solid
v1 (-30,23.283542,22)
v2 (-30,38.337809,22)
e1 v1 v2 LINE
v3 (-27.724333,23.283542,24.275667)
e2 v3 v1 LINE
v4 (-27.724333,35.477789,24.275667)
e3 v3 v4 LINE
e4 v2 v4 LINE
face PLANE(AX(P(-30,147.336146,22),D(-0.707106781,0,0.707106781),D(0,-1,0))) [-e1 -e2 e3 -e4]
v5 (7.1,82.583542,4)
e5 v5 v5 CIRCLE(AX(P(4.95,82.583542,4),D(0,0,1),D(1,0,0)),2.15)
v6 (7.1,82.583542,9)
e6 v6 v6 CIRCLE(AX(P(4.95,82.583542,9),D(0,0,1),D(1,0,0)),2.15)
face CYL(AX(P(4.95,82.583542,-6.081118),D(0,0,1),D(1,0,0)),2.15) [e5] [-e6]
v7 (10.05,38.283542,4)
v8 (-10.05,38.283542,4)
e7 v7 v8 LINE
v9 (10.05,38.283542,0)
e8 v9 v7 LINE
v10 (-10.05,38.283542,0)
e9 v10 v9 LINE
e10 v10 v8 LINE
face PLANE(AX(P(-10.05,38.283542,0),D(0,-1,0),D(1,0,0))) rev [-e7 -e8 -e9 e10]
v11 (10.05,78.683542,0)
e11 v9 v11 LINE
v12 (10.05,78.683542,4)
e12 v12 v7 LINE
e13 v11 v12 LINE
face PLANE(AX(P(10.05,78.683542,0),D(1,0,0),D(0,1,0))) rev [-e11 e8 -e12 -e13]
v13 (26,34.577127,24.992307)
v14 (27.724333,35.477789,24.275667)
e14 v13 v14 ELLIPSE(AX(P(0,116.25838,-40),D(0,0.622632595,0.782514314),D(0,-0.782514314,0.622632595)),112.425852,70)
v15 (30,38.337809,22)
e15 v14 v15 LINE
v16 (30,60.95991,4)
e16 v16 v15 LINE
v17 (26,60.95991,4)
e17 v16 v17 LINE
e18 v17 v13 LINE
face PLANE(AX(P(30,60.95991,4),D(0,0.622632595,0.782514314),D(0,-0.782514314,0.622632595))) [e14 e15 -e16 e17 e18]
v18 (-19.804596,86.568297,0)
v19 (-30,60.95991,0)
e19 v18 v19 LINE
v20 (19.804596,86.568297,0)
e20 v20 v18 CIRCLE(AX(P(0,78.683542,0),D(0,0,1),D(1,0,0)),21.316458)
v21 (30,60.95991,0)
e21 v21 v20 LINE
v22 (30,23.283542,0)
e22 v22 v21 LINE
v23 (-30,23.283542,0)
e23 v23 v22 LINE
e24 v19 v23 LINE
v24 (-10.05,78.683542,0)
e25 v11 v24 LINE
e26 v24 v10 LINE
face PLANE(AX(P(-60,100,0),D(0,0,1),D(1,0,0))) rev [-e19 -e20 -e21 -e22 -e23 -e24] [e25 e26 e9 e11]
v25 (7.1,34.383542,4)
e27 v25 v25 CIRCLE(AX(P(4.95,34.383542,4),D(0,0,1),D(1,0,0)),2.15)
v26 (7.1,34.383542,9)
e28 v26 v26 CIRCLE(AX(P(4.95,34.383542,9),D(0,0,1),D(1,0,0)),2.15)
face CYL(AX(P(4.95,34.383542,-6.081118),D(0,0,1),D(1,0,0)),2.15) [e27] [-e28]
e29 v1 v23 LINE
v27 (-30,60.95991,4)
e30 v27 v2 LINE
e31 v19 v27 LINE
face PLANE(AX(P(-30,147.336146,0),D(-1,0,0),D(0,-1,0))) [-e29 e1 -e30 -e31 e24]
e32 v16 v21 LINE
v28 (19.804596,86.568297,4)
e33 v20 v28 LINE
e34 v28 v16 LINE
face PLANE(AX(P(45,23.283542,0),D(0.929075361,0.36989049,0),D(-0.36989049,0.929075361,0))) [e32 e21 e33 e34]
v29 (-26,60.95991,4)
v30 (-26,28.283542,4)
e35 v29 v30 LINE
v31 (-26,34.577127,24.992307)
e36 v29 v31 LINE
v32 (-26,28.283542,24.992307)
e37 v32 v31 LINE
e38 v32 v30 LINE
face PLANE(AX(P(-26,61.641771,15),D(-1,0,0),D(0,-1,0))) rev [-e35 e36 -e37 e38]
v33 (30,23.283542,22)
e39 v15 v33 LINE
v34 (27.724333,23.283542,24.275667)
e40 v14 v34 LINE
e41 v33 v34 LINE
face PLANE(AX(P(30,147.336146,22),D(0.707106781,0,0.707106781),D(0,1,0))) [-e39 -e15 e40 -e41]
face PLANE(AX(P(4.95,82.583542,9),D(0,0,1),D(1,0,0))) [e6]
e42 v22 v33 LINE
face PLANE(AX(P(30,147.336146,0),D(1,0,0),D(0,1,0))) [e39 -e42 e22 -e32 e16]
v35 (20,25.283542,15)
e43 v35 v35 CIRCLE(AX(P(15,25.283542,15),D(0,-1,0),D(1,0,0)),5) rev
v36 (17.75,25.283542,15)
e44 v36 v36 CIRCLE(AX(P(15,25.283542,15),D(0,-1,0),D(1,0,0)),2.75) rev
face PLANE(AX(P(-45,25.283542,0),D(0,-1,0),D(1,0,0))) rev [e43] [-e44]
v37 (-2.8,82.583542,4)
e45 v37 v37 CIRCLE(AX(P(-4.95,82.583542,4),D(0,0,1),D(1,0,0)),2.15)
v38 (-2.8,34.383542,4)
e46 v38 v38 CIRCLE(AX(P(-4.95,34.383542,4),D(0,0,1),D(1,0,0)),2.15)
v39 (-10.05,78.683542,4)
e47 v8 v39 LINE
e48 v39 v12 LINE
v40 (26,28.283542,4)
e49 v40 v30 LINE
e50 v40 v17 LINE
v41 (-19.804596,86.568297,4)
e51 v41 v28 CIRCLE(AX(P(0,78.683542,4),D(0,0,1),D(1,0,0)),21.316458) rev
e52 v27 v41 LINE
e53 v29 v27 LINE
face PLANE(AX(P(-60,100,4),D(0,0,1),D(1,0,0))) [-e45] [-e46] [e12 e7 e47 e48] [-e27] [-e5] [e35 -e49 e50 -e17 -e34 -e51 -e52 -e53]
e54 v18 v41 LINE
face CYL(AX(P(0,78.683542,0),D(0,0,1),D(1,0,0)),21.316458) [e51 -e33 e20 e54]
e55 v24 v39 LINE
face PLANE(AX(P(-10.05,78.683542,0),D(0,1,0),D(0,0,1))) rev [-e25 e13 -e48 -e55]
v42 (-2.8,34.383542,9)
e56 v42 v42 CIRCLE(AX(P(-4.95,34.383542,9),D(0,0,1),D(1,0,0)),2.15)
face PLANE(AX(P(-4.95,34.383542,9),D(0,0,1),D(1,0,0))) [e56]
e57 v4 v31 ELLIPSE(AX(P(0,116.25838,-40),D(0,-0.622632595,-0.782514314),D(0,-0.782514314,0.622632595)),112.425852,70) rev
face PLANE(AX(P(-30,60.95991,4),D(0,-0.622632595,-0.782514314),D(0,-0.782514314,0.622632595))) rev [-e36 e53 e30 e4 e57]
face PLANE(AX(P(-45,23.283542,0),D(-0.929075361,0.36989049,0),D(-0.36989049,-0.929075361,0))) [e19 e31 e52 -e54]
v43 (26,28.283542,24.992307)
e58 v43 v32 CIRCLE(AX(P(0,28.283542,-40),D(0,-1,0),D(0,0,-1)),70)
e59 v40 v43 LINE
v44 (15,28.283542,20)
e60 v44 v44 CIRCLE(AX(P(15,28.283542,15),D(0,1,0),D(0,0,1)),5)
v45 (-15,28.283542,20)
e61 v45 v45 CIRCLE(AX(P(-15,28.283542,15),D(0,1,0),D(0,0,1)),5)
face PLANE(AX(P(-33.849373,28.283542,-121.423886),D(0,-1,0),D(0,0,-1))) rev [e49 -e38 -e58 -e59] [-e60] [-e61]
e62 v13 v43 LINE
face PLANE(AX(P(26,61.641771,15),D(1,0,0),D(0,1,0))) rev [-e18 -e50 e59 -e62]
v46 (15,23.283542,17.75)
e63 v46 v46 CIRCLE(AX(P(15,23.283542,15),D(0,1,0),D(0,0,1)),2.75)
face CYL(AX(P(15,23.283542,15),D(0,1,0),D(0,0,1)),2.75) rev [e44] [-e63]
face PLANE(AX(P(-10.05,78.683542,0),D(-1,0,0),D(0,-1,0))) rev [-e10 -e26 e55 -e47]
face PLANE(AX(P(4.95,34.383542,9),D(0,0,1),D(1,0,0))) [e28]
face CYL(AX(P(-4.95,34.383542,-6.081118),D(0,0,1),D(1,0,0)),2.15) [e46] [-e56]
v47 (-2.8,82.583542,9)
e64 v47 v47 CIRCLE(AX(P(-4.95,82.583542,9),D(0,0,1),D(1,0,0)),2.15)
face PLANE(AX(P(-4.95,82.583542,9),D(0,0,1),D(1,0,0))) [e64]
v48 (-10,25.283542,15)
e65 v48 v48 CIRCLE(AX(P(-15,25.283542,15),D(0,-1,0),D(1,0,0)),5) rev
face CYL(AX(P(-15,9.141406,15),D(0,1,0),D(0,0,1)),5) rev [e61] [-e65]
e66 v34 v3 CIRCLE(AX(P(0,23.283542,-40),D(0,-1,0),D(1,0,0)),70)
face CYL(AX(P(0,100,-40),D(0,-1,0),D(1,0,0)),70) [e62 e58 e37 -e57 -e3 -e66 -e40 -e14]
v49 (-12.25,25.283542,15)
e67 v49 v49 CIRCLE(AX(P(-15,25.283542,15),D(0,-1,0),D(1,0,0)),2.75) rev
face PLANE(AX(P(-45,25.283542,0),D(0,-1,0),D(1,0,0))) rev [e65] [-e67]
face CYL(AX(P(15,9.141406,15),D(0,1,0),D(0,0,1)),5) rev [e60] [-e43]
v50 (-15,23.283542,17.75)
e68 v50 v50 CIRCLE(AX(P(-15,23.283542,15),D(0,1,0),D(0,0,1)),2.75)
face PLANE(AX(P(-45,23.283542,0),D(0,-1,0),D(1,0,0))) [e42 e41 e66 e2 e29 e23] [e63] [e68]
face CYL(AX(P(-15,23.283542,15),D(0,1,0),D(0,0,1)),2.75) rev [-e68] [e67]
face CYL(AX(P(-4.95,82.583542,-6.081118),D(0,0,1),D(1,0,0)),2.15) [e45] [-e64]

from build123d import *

# Parameters (mm, degrees)
SKETCH1_W                = 120
SKETCH1_H                = 30
BOSS_EXTRUDE1_DEPTH      = 100
CUT_EXTRUDE1_DEPTH       = 121.415945788
CUT_EXTRUDE1_DEPTH_BACK  = 121.415945788
SKETCH2_R                = 2.15
SKETCH2_W                = 20.1
SKETCH2_H                = 40.4
SKETCH3_OUTSIDE_W        = 153.812
SKETCH3_OUTSIDE_H        = 133.812
CUT_EXTRUDE2_DEPTH       = 121.415945788
CUT_EXTRUDE3_START       = -30
CUT_EXTRUDE3_DEPTH       = 30
SKETCH5_W                = 67.698745078
SKETCH5_H                = 100.8
CUT_EXTRUDE4_DEPTH       = 26
RIB1_REACH               = 122.416
SKETCH6_WALL_W           = 284.590065176
SKETCH6_WALL_H           = 4
RIB6_REACH               = 122.416
SKETCH7_WALL_W           = 284.590065176
SKETCH7_WALL_H           = 4
BOSS_EXTRUDE2_DEPTH      = 5
BOSS_EXTRUDE2_DEPTH_BACK = 4
SKETCH8_R                = 2.15
CUT_EXTRUDE5_DEPTH       = 84.326168543
CUT_EXTRUDE5_DEPTH_BACK  = 84.326168543
SKETCH9_R                = 2.75
SKETCH10_R               = 5
CUT_EXTRUDE6_DEPTH       = 3
CHAMFER1_SIZE            = 8
CUT_EXTRUDE7_START       = -12.194246874
CUT_EXTRUDE7_DEPTH       = 12.194246874


# Read off the part's stored shape, not the designer's step: Cut-Extrude3, Cut-Extrude7
with BuildPart() as part:
    # Sketch1 → Boss-Extrude1 (new body)
    with BuildSketch(Plane(origin=(0, 0, 0), x_dir=(1, 0, 0), z_dir=(0, 1, 0))):
        with Locations((0, -15)):
            Rectangle(SKETCH1_W, SKETCH1_H)
    extrude(amount=BOSS_EXTRUDE1_DEPTH)

    # Sketch2 → Cut-Extrude1 (cut, two sides: drawn at the far end of the back side and taken through both)
    with BuildSketch(Plane.XY.offset(30).offset(-CUT_EXTRUDE1_DEPTH_BACK)):
        with Locations((-4.95, 82.583541889)):
            Circle(SKETCH2_R)
        with Locations((4.95, 82.583541889)):
            Circle(SKETCH2_R)
        with Locations((-4.95, 34.383541889)):
            Circle(SKETCH2_R)
        with Locations((4.95, 34.383541889)):
            Circle(SKETCH2_R)
        with Locations((0, 58.483541889)):
            Rectangle(SKETCH2_W, SKETCH2_H)
    extrude(amount=CUT_EXTRUDE1_DEPTH + CUT_EXTRUDE1_DEPTH_BACK, mode=Mode.SUBTRACT)

    # Sketch3 outside → Cut-Extrude2 (cut, through all)
    with BuildSketch(Plane.XY.offset(30)):
        with Locations((0, 50)):
            Rectangle(SKETCH3_OUTSIDE_W, SKETCH3_OUTSIDE_H)
        with BuildLine():
            Line((-45, 23.283541889), (45, 23.283541889))
            Line((45, 23.283541889), (19.804596008, 86.568297014))
            ThreePointArc((19.804596008, 86.568297014), (0, 100), (-19.804596008, 86.568297014))
            Line((-19.804596008, 86.568297014), (-45, 23.283541889))
        make_face(mode=Mode.SUBTRACT)
    extrude(amount=-CUT_EXTRUDE2_DEPTH, mode=Mode.SUBTRACT)

    # Cut-Extrude3 outline → Cut-Extrude3 (cut)
    with BuildSketch(Plane.XY.offset(30).offset(CUT_EXTRUDE3_START)):
        Polygon((30, 60.95991045), (30, 23.283541889), (45, 23.283541889), align=None)
        Polygon((-30, 23.283541889), (-30, 60.95991045), (-45, 23.283541889), align=None)
    extrude(amount=CUT_EXTRUDE3_DEPTH, mode=Mode.SUBTRACT)

    # Sketch5 → Cut-Extrude4 (cut)
    with BuildSketch(Plane.XY.offset(30)):
        with Locations((0, 78.683541889)):
            Rectangle(SKETCH5_W, SKETCH5_H)
    extrude(amount=-CUT_EXTRUDE4_DEPTH, mode=Mode.SUBTRACT)

    # Sketch6 wall → Rib1 (add, up to next)
    with BuildSketch(Plane(origin=(-30, 44.62172617, 17), x_dir=(0, -0.782514313837, 0.622632595228), z_dir=(0, 0.622632595228, 0.782514313837)), mode=Mode.PRIVATE) as rib1_sk1:
        with Locations((0, 2)):
            Rectangle(SKETCH6_WALL_W, SKETCH6_WALL_H)
    rib1_tool1 = extrude(rib1_sk1.sketch, amount=-RIB1_REACH, mode=Mode.PRIVATE) - part.part
    add(rib1_tool1.solids().sort_by_distance((-30, 44.62172617, 17))[0])

    # Sketch7 wall → Rib6 (add, up to next)
    with BuildSketch(Plane(origin=(30, 44.62172617, 17), x_dir=(0, -0.782514313837, 0.622632595228), z_dir=(0, -0.622632595228, -0.782514313837)), mode=Mode.PRIVATE) as rib6_sk1:
        with Locations((0, 2)):
            Rectangle(SKETCH7_WALL_W, SKETCH7_WALL_H)
    rib6_tool1 = extrude(rib6_sk1.sketch, amount=RIB6_REACH, mode=Mode.PRIVATE) - part.part
    add(rib6_tool1.solids().sort_by_distance((30, 44.62172617, 17))[0])

    # Sketch8 → Boss-Extrude2 (add, two sides: drawn at the far end of the back side and taken through both)
    with BuildSketch(Plane.XY.offset(4).offset(-BOSS_EXTRUDE2_DEPTH_BACK)):
        with Locations((-4.95, 82.583541889)):
            Circle(SKETCH8_R)
        with Locations((4.95, 82.583541889)):
            Circle(SKETCH8_R)
        with Locations((-4.95, 34.383541889)):
            Circle(SKETCH8_R)
        with Locations((4.95, 34.383541889)):
            Circle(SKETCH8_R)
    extrude(amount=BOSS_EXTRUDE2_DEPTH + BOSS_EXTRUDE2_DEPTH_BACK)

    # Sketch9 → Cut-Extrude5 (cut, two sides: drawn at the far end of the back side and taken through both)
    with BuildSketch(Plane(origin=(0, 28.283541889, 0), x_dir=(1, 0, 0), z_dir=(0, 1, 0)).offset(-CUT_EXTRUDE5_DEPTH_BACK)):
        with Locations(Location((-15, -15, 0), (0, 0, 270))):
            Circle(SKETCH9_R)
        with Locations(Location((15, -15, 0), (0, 0, 270))):
            Circle(SKETCH9_R)
    extrude(amount=CUT_EXTRUDE5_DEPTH + CUT_EXTRUDE5_DEPTH_BACK, mode=Mode.SUBTRACT)

    # Sketch10 → Cut-Extrude6 (cut)
    with BuildSketch(Plane(origin=(0, 28.283541889, 0), x_dir=(1, 0, 0), z_dir=(0, 1, 0))):
        with Locations(Location((-15, -15, 0), (0, 0, 270))):
            Circle(SKETCH10_R)
        with Locations(Location((15, -15, 0), (0, 0, 270))):
            Circle(SKETCH10_R)
    extrude(amount=-CUT_EXTRUDE6_DEPTH, mode=Mode.SUBTRACT)

    # Chamfer1
    # the kernel refuses this chamfer: 8 mm, written as the material it takes off along each edge
    with BuildSketch(Plane(origin=(-30, 2.710077985, 30), x_dir=(-0.02749587661058658, 0, -0.9996219169112968), z_dir=(0, 1, 0))) as chamfer1_piece_1:
        Polygon((CHAMFER1_SIZE * 0.999621916911, -CHAMFER1_SIZE * 0.0274958766106), (-CHAMFER1_SIZE * 0.0274958766106, -CHAMFER1_SIZE * 0.999621916911), (0, 0), align=None)
    extrude(amount=46.146927807, mode=Mode.SUBTRACT)
    with BuildSketch(Plane(origin=(30, 48.857005793, 30), x_dir=(-0.9996219169112968, 0, 0.027495876610586487), z_dir=(0, -1, 0))) as chamfer1_piece_2:
        Polygon((CHAMFER1_SIZE * 0.999621916911, CHAMFER1_SIZE * 0.0274958766106), (-CHAMFER1_SIZE * 0.0274958766106, CHAMFER1_SIZE * 0.999621916911), (0, 0), align=None)
    extrude(amount=46.146927807, mode=Mode.SUBTRACT)

    # Cut-Extrude7 outline → Cut-Extrude7 (cut)
    with BuildSketch(Plane.XZ.offset(-23.283541889).offset(CUT_EXTRUDE7_START)):
        with BuildLine():
            ThreePointArc((-27.724333118, 24.275666882), (-14.154563191, 28.553981218), (0, 30))
            Line((0, 30), (-22, 30))
            Line((-22, 30), (-27.724333118, 24.275666882))
        make_face()
        with BuildLine():
            ThreePointArc((0, 30), (14.154563191, 28.553981218), (27.724333118, 24.275666882))
            Line((27.724333118, 24.275666882), (22, 30))
            Line((22, 30), (0, 30))
        make_face()
    extrude(amount=CUT_EXTRUDE7_DEPTH, mode=Mode.SUBTRACT)


solid = part.part
